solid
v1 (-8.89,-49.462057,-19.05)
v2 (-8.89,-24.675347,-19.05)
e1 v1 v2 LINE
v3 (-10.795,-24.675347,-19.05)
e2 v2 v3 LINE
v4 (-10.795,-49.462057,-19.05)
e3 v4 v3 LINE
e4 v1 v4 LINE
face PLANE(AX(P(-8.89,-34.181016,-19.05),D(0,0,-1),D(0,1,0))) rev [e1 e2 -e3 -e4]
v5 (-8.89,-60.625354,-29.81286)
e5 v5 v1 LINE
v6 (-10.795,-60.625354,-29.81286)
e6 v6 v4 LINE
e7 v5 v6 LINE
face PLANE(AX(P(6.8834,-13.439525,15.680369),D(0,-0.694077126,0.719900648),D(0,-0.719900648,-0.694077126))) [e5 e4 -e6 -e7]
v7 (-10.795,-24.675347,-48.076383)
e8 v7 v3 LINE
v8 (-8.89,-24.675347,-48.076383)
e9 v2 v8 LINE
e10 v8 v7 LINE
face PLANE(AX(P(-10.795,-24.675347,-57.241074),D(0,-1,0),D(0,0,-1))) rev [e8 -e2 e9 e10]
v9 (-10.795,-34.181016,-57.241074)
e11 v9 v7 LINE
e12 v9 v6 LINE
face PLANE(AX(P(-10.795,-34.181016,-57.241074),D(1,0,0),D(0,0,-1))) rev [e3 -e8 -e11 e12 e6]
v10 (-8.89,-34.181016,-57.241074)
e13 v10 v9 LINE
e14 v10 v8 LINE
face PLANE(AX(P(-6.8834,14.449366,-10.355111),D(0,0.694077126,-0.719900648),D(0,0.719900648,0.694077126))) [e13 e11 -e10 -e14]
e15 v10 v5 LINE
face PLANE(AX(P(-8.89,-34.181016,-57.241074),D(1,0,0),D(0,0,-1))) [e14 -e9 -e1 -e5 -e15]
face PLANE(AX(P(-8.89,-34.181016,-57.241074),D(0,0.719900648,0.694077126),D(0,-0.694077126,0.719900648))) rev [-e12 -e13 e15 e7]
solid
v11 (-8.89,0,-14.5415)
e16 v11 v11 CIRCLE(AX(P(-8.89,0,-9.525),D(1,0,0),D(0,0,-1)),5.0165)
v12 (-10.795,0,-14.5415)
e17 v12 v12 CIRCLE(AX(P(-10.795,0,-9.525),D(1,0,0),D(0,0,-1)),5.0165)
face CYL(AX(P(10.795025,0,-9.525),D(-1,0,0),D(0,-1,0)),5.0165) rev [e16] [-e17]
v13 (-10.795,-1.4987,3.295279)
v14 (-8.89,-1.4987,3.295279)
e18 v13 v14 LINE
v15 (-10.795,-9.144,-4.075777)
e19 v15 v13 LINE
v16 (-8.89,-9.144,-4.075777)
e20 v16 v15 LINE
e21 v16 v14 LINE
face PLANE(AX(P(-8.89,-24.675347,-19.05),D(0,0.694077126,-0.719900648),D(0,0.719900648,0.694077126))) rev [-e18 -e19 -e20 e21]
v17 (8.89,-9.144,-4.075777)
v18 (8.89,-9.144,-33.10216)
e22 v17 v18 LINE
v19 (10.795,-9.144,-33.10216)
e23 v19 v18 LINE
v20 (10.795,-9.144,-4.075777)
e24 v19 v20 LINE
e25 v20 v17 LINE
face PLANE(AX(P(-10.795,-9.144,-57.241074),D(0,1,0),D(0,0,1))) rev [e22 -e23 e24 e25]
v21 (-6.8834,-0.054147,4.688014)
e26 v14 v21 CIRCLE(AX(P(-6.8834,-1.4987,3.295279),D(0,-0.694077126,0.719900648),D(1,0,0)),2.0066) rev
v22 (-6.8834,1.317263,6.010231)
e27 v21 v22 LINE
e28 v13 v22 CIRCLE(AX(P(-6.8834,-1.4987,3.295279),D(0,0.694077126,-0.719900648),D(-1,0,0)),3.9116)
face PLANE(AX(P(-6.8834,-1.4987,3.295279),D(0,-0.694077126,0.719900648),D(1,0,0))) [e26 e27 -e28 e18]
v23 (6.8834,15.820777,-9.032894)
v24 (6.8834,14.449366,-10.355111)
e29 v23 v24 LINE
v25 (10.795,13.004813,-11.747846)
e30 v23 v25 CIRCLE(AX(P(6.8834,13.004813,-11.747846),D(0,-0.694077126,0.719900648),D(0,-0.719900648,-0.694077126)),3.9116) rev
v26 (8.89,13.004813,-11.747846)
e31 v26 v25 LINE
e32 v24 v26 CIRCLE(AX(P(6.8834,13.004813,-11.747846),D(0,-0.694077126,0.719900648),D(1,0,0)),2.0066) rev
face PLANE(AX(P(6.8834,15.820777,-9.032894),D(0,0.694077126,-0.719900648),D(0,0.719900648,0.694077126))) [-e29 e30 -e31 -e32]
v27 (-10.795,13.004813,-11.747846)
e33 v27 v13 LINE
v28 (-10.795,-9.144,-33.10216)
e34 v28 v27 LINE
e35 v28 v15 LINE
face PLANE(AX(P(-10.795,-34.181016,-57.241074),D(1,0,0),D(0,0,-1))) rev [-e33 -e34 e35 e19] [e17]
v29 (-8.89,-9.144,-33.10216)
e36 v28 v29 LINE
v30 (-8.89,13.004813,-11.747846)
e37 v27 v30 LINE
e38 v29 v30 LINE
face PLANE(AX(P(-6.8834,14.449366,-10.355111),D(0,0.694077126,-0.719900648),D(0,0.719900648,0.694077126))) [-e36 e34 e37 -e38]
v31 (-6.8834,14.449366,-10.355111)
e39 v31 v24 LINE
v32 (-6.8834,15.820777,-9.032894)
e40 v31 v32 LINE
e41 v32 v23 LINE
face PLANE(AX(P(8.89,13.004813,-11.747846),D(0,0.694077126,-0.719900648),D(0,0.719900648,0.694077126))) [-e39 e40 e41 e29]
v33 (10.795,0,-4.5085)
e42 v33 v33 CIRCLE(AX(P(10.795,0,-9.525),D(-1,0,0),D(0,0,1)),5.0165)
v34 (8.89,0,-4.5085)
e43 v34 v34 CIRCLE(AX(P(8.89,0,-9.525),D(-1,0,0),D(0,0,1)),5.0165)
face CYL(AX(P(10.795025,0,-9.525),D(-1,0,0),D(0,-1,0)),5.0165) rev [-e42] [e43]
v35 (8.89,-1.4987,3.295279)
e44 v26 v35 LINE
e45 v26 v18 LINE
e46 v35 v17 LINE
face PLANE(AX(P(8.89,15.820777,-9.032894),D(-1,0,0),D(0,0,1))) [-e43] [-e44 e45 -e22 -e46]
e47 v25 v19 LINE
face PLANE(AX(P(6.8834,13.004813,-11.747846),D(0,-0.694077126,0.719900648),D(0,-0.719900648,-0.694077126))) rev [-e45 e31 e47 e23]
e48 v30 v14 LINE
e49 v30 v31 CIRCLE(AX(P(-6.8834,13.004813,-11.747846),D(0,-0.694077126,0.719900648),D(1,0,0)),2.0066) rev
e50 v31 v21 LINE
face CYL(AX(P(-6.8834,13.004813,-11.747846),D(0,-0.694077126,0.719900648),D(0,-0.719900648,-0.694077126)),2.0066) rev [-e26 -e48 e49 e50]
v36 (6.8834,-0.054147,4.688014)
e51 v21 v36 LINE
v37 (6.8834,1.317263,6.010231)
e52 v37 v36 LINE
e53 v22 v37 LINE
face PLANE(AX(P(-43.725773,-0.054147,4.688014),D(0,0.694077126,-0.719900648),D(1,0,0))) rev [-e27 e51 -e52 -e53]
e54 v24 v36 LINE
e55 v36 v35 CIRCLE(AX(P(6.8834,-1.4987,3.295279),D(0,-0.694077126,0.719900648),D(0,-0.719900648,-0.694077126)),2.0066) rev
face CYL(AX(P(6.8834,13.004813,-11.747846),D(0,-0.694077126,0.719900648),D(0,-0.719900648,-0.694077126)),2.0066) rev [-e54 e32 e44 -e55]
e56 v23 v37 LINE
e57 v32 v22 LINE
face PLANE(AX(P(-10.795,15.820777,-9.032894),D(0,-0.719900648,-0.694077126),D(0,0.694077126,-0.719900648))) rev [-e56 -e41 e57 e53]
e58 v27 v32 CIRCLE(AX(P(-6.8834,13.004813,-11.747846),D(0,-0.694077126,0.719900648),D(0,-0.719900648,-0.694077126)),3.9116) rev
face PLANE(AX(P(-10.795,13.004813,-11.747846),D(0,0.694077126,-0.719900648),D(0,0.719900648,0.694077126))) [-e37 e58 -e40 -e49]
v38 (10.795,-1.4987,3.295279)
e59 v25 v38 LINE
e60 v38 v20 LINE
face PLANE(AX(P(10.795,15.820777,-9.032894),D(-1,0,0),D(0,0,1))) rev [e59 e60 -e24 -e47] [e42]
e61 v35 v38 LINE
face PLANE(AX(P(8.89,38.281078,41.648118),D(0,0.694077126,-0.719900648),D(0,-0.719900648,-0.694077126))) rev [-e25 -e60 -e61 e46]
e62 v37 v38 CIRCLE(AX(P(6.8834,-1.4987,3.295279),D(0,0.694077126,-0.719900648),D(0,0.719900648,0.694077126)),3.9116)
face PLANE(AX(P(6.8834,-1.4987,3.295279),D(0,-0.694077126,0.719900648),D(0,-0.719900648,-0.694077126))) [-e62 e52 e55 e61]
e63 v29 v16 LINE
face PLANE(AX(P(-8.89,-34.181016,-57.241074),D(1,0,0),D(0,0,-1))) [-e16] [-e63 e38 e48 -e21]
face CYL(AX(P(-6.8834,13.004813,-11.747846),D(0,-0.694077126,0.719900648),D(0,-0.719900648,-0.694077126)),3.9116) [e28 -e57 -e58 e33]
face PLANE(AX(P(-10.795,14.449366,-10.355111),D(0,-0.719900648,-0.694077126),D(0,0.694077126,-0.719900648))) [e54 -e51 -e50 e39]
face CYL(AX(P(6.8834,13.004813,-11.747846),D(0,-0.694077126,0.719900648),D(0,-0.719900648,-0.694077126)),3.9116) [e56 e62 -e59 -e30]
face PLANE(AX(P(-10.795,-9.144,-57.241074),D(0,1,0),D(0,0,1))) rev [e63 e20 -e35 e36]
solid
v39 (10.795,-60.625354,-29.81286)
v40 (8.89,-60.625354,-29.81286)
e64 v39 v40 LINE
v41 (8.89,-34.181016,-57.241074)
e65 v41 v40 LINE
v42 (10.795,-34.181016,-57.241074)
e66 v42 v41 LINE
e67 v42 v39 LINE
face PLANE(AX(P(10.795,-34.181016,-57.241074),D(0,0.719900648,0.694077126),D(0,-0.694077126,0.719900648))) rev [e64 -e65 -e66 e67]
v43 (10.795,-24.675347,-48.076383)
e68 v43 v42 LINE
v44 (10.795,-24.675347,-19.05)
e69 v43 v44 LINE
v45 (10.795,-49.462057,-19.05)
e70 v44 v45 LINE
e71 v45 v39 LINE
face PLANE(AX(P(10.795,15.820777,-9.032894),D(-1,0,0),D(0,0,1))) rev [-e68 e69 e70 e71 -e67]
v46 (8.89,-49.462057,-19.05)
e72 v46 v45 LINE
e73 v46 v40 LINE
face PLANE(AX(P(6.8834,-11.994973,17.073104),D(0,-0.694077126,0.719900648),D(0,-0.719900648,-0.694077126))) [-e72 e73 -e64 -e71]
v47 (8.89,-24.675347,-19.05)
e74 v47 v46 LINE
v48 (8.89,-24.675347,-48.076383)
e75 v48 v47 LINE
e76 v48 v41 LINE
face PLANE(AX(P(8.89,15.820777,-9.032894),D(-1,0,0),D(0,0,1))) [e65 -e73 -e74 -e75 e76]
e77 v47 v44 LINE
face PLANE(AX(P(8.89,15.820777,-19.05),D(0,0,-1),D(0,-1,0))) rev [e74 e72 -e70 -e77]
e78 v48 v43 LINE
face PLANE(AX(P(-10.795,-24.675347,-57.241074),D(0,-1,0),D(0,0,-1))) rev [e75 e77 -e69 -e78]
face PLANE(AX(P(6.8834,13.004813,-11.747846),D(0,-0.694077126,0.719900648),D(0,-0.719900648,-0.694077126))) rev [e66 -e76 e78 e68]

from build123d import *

# Parameters (mm, degrees)
BASE_FLANGE1_DEPTH      = 19.05
CUT_EXTRUDE1_START      = -21.59
CUT_EXTRUDE1_DEPTH      = 21.59
CUT_EXTRUDE2_DEPTH      = 87.128405868
CUT_EXTRUDE2_DEPTH_BACK = 87.128405868
CUT_EXTRUDE3_DEPTH      = 86.670726753
CUT_EXTRUDE3_DEPTH_BACK = 86.670726753
SKETCH9_R               = 5.0165
CUT_EXTRUDE6_DEPTH      = 86.058030225
CUT_EXTRUDE6_DEPTH_BACK = 86.058030225
SKETCH10_W              = 21.59
SKETCH10_H              = 15.531347002


# Read off the part's stored shape, not the designer's step: Cut-Extrude1
# Sheet-metal steps are written as plain solids
with BuildPart() as part:
    # Sketch1 → Base-Flange1 (new, symmetric)
    with BuildSketch(Plane(origin=(0, -0.842343472, 1.363693041), x_dir=(1, 0, 0), z_dir=(0, -0.6940771264425077, 0.7199006476933545))):
        with BuildLine():
            Line((-10.795, -64.676760458), (-10.795, 0.868157815))
            ThreePointArc((-10.795, 0.868157815), (-9.649318885, 3.6340767), (-6.8834, 4.779757815))
            Line((-6.8834, 4.779757815), (6.8834, 4.779757815))
            ThreePointArc((6.8834, 4.779757815), (9.649318885, 3.6340767), (10.795, 0.868157815))
            Line((10.795, 0.868157815), (10.795, -64.676760458))
            Line((10.795, -64.676760458), (8.89, -64.676760458))
            Line((8.89, -64.676760458), (8.89, 0.868157815))
            ThreePointArc((8.89, 0.868157815), (8.302280467, 2.287038282), (6.8834, 2.874757815))
            Line((6.8834, 2.874757815), (-6.8834, 2.874757815))
            ThreePointArc((-6.8834, 2.874757815), (-8.302280467, 2.287038282), (-8.89, 0.868157815))
            Line((-8.89, 0.868157815), (-8.89, -64.676760458))
            Line((-8.89, -64.676760458), (-10.795, -64.676760458))
        make_face()
    extrude(amount=BASE_FLANGE1_DEPTH, both=True)

    # Cut-Extrude1 outline → Cut-Extrude1 (cut)
    with BuildSketch(Plane.ZY.offset(10.795).offset(CUT_EXTRUDE1_START)):
        Polygon((3.295278576, -1.498700046), (-19.05, -24.675347002), (-19.05, -49.462056695), (15.680368861, -13.439525358), (18.395320949, -10.623561984), (6.010230664, 1.317263328), align=None)
    extrude(amount=CUT_EXTRUDE1_DEPTH, mode=Mode.SUBTRACT)

    # Sketch7 → Cut-Extrude2 (cut, two sides: drawn at the far end of the back side and taken through both)
    with BuildSketch(Plane.ZY.offset(10.795).offset(-CUT_EXTRUDE2_DEPTH_BACK)):
        Polygon((11.882741933, -6.055059051), (9.429090908, -1.978959147), (12.655449119, -0.036819034), (15.109100144, -4.112918938), align=None)
    extrude(amount=CUT_EXTRUDE2_DEPTH + CUT_EXTRUDE2_DEPTH_BACK, mode=Mode.SUBTRACT)

    # Sketch9 → Cut-Extrude3 (cut, two sides: drawn at the far end of the back side and taken through both)
    with BuildSketch(Plane.ZY.offset(-8.89).offset(-CUT_EXTRUDE3_DEPTH_BACK)):
        with Locations((-9.525, 0)):
            Circle(SKETCH9_R)
    extrude(amount=CUT_EXTRUDE3_DEPTH + CUT_EXTRUDE3_DEPTH_BACK, mode=Mode.SUBTRACT)

    # Sketch10 → Cut-Extrude6 (cut, two sides: drawn at the far end of the back side and taken through both)
    with BuildSketch(Plane.XY.offset(1.435180439).offset(-CUT_EXTRUDE6_DEPTH_BACK)):
        with Locations((0, -16.909673501)):
            Rectangle(SKETCH10_W, SKETCH10_H)
    extrude(amount=CUT_EXTRUDE6_DEPTH + CUT_EXTRUDE6_DEPTH_BACK, mode=Mode.SUBTRACT)


with BuildPart() as cut_extrude6_piece_1:
    # of the separate pieces the step leaves, piece 1, a body of its own (cut_extrude6_pieces)
    add(part.part.solids().sort_by_distance((-10.795, -9.144, -33.102159972))[0])


with BuildPart() as cut_extrude6_piece_2:
    # of the separate pieces the step leaves, piece 2, a body of its own (cut_extrude6_pieces)
    add(part.part.solids().sort_by_distance((-10.795, -34.181015958, -57.241074344))[0])


with BuildPart() as cut_extrude6_piece_3:
    # of the separate pieces the step leaves, piece 3, a body of its own (cut_extrude6_pieces)
    add(part.part.solids().sort_by_distance((10.795, -24.675347002, -48.076382778))[0])


solid = Compound([cut_extrude6_piece_1.part, cut_extrude6_piece_2.part, cut_extrude6_piece_3.part])
